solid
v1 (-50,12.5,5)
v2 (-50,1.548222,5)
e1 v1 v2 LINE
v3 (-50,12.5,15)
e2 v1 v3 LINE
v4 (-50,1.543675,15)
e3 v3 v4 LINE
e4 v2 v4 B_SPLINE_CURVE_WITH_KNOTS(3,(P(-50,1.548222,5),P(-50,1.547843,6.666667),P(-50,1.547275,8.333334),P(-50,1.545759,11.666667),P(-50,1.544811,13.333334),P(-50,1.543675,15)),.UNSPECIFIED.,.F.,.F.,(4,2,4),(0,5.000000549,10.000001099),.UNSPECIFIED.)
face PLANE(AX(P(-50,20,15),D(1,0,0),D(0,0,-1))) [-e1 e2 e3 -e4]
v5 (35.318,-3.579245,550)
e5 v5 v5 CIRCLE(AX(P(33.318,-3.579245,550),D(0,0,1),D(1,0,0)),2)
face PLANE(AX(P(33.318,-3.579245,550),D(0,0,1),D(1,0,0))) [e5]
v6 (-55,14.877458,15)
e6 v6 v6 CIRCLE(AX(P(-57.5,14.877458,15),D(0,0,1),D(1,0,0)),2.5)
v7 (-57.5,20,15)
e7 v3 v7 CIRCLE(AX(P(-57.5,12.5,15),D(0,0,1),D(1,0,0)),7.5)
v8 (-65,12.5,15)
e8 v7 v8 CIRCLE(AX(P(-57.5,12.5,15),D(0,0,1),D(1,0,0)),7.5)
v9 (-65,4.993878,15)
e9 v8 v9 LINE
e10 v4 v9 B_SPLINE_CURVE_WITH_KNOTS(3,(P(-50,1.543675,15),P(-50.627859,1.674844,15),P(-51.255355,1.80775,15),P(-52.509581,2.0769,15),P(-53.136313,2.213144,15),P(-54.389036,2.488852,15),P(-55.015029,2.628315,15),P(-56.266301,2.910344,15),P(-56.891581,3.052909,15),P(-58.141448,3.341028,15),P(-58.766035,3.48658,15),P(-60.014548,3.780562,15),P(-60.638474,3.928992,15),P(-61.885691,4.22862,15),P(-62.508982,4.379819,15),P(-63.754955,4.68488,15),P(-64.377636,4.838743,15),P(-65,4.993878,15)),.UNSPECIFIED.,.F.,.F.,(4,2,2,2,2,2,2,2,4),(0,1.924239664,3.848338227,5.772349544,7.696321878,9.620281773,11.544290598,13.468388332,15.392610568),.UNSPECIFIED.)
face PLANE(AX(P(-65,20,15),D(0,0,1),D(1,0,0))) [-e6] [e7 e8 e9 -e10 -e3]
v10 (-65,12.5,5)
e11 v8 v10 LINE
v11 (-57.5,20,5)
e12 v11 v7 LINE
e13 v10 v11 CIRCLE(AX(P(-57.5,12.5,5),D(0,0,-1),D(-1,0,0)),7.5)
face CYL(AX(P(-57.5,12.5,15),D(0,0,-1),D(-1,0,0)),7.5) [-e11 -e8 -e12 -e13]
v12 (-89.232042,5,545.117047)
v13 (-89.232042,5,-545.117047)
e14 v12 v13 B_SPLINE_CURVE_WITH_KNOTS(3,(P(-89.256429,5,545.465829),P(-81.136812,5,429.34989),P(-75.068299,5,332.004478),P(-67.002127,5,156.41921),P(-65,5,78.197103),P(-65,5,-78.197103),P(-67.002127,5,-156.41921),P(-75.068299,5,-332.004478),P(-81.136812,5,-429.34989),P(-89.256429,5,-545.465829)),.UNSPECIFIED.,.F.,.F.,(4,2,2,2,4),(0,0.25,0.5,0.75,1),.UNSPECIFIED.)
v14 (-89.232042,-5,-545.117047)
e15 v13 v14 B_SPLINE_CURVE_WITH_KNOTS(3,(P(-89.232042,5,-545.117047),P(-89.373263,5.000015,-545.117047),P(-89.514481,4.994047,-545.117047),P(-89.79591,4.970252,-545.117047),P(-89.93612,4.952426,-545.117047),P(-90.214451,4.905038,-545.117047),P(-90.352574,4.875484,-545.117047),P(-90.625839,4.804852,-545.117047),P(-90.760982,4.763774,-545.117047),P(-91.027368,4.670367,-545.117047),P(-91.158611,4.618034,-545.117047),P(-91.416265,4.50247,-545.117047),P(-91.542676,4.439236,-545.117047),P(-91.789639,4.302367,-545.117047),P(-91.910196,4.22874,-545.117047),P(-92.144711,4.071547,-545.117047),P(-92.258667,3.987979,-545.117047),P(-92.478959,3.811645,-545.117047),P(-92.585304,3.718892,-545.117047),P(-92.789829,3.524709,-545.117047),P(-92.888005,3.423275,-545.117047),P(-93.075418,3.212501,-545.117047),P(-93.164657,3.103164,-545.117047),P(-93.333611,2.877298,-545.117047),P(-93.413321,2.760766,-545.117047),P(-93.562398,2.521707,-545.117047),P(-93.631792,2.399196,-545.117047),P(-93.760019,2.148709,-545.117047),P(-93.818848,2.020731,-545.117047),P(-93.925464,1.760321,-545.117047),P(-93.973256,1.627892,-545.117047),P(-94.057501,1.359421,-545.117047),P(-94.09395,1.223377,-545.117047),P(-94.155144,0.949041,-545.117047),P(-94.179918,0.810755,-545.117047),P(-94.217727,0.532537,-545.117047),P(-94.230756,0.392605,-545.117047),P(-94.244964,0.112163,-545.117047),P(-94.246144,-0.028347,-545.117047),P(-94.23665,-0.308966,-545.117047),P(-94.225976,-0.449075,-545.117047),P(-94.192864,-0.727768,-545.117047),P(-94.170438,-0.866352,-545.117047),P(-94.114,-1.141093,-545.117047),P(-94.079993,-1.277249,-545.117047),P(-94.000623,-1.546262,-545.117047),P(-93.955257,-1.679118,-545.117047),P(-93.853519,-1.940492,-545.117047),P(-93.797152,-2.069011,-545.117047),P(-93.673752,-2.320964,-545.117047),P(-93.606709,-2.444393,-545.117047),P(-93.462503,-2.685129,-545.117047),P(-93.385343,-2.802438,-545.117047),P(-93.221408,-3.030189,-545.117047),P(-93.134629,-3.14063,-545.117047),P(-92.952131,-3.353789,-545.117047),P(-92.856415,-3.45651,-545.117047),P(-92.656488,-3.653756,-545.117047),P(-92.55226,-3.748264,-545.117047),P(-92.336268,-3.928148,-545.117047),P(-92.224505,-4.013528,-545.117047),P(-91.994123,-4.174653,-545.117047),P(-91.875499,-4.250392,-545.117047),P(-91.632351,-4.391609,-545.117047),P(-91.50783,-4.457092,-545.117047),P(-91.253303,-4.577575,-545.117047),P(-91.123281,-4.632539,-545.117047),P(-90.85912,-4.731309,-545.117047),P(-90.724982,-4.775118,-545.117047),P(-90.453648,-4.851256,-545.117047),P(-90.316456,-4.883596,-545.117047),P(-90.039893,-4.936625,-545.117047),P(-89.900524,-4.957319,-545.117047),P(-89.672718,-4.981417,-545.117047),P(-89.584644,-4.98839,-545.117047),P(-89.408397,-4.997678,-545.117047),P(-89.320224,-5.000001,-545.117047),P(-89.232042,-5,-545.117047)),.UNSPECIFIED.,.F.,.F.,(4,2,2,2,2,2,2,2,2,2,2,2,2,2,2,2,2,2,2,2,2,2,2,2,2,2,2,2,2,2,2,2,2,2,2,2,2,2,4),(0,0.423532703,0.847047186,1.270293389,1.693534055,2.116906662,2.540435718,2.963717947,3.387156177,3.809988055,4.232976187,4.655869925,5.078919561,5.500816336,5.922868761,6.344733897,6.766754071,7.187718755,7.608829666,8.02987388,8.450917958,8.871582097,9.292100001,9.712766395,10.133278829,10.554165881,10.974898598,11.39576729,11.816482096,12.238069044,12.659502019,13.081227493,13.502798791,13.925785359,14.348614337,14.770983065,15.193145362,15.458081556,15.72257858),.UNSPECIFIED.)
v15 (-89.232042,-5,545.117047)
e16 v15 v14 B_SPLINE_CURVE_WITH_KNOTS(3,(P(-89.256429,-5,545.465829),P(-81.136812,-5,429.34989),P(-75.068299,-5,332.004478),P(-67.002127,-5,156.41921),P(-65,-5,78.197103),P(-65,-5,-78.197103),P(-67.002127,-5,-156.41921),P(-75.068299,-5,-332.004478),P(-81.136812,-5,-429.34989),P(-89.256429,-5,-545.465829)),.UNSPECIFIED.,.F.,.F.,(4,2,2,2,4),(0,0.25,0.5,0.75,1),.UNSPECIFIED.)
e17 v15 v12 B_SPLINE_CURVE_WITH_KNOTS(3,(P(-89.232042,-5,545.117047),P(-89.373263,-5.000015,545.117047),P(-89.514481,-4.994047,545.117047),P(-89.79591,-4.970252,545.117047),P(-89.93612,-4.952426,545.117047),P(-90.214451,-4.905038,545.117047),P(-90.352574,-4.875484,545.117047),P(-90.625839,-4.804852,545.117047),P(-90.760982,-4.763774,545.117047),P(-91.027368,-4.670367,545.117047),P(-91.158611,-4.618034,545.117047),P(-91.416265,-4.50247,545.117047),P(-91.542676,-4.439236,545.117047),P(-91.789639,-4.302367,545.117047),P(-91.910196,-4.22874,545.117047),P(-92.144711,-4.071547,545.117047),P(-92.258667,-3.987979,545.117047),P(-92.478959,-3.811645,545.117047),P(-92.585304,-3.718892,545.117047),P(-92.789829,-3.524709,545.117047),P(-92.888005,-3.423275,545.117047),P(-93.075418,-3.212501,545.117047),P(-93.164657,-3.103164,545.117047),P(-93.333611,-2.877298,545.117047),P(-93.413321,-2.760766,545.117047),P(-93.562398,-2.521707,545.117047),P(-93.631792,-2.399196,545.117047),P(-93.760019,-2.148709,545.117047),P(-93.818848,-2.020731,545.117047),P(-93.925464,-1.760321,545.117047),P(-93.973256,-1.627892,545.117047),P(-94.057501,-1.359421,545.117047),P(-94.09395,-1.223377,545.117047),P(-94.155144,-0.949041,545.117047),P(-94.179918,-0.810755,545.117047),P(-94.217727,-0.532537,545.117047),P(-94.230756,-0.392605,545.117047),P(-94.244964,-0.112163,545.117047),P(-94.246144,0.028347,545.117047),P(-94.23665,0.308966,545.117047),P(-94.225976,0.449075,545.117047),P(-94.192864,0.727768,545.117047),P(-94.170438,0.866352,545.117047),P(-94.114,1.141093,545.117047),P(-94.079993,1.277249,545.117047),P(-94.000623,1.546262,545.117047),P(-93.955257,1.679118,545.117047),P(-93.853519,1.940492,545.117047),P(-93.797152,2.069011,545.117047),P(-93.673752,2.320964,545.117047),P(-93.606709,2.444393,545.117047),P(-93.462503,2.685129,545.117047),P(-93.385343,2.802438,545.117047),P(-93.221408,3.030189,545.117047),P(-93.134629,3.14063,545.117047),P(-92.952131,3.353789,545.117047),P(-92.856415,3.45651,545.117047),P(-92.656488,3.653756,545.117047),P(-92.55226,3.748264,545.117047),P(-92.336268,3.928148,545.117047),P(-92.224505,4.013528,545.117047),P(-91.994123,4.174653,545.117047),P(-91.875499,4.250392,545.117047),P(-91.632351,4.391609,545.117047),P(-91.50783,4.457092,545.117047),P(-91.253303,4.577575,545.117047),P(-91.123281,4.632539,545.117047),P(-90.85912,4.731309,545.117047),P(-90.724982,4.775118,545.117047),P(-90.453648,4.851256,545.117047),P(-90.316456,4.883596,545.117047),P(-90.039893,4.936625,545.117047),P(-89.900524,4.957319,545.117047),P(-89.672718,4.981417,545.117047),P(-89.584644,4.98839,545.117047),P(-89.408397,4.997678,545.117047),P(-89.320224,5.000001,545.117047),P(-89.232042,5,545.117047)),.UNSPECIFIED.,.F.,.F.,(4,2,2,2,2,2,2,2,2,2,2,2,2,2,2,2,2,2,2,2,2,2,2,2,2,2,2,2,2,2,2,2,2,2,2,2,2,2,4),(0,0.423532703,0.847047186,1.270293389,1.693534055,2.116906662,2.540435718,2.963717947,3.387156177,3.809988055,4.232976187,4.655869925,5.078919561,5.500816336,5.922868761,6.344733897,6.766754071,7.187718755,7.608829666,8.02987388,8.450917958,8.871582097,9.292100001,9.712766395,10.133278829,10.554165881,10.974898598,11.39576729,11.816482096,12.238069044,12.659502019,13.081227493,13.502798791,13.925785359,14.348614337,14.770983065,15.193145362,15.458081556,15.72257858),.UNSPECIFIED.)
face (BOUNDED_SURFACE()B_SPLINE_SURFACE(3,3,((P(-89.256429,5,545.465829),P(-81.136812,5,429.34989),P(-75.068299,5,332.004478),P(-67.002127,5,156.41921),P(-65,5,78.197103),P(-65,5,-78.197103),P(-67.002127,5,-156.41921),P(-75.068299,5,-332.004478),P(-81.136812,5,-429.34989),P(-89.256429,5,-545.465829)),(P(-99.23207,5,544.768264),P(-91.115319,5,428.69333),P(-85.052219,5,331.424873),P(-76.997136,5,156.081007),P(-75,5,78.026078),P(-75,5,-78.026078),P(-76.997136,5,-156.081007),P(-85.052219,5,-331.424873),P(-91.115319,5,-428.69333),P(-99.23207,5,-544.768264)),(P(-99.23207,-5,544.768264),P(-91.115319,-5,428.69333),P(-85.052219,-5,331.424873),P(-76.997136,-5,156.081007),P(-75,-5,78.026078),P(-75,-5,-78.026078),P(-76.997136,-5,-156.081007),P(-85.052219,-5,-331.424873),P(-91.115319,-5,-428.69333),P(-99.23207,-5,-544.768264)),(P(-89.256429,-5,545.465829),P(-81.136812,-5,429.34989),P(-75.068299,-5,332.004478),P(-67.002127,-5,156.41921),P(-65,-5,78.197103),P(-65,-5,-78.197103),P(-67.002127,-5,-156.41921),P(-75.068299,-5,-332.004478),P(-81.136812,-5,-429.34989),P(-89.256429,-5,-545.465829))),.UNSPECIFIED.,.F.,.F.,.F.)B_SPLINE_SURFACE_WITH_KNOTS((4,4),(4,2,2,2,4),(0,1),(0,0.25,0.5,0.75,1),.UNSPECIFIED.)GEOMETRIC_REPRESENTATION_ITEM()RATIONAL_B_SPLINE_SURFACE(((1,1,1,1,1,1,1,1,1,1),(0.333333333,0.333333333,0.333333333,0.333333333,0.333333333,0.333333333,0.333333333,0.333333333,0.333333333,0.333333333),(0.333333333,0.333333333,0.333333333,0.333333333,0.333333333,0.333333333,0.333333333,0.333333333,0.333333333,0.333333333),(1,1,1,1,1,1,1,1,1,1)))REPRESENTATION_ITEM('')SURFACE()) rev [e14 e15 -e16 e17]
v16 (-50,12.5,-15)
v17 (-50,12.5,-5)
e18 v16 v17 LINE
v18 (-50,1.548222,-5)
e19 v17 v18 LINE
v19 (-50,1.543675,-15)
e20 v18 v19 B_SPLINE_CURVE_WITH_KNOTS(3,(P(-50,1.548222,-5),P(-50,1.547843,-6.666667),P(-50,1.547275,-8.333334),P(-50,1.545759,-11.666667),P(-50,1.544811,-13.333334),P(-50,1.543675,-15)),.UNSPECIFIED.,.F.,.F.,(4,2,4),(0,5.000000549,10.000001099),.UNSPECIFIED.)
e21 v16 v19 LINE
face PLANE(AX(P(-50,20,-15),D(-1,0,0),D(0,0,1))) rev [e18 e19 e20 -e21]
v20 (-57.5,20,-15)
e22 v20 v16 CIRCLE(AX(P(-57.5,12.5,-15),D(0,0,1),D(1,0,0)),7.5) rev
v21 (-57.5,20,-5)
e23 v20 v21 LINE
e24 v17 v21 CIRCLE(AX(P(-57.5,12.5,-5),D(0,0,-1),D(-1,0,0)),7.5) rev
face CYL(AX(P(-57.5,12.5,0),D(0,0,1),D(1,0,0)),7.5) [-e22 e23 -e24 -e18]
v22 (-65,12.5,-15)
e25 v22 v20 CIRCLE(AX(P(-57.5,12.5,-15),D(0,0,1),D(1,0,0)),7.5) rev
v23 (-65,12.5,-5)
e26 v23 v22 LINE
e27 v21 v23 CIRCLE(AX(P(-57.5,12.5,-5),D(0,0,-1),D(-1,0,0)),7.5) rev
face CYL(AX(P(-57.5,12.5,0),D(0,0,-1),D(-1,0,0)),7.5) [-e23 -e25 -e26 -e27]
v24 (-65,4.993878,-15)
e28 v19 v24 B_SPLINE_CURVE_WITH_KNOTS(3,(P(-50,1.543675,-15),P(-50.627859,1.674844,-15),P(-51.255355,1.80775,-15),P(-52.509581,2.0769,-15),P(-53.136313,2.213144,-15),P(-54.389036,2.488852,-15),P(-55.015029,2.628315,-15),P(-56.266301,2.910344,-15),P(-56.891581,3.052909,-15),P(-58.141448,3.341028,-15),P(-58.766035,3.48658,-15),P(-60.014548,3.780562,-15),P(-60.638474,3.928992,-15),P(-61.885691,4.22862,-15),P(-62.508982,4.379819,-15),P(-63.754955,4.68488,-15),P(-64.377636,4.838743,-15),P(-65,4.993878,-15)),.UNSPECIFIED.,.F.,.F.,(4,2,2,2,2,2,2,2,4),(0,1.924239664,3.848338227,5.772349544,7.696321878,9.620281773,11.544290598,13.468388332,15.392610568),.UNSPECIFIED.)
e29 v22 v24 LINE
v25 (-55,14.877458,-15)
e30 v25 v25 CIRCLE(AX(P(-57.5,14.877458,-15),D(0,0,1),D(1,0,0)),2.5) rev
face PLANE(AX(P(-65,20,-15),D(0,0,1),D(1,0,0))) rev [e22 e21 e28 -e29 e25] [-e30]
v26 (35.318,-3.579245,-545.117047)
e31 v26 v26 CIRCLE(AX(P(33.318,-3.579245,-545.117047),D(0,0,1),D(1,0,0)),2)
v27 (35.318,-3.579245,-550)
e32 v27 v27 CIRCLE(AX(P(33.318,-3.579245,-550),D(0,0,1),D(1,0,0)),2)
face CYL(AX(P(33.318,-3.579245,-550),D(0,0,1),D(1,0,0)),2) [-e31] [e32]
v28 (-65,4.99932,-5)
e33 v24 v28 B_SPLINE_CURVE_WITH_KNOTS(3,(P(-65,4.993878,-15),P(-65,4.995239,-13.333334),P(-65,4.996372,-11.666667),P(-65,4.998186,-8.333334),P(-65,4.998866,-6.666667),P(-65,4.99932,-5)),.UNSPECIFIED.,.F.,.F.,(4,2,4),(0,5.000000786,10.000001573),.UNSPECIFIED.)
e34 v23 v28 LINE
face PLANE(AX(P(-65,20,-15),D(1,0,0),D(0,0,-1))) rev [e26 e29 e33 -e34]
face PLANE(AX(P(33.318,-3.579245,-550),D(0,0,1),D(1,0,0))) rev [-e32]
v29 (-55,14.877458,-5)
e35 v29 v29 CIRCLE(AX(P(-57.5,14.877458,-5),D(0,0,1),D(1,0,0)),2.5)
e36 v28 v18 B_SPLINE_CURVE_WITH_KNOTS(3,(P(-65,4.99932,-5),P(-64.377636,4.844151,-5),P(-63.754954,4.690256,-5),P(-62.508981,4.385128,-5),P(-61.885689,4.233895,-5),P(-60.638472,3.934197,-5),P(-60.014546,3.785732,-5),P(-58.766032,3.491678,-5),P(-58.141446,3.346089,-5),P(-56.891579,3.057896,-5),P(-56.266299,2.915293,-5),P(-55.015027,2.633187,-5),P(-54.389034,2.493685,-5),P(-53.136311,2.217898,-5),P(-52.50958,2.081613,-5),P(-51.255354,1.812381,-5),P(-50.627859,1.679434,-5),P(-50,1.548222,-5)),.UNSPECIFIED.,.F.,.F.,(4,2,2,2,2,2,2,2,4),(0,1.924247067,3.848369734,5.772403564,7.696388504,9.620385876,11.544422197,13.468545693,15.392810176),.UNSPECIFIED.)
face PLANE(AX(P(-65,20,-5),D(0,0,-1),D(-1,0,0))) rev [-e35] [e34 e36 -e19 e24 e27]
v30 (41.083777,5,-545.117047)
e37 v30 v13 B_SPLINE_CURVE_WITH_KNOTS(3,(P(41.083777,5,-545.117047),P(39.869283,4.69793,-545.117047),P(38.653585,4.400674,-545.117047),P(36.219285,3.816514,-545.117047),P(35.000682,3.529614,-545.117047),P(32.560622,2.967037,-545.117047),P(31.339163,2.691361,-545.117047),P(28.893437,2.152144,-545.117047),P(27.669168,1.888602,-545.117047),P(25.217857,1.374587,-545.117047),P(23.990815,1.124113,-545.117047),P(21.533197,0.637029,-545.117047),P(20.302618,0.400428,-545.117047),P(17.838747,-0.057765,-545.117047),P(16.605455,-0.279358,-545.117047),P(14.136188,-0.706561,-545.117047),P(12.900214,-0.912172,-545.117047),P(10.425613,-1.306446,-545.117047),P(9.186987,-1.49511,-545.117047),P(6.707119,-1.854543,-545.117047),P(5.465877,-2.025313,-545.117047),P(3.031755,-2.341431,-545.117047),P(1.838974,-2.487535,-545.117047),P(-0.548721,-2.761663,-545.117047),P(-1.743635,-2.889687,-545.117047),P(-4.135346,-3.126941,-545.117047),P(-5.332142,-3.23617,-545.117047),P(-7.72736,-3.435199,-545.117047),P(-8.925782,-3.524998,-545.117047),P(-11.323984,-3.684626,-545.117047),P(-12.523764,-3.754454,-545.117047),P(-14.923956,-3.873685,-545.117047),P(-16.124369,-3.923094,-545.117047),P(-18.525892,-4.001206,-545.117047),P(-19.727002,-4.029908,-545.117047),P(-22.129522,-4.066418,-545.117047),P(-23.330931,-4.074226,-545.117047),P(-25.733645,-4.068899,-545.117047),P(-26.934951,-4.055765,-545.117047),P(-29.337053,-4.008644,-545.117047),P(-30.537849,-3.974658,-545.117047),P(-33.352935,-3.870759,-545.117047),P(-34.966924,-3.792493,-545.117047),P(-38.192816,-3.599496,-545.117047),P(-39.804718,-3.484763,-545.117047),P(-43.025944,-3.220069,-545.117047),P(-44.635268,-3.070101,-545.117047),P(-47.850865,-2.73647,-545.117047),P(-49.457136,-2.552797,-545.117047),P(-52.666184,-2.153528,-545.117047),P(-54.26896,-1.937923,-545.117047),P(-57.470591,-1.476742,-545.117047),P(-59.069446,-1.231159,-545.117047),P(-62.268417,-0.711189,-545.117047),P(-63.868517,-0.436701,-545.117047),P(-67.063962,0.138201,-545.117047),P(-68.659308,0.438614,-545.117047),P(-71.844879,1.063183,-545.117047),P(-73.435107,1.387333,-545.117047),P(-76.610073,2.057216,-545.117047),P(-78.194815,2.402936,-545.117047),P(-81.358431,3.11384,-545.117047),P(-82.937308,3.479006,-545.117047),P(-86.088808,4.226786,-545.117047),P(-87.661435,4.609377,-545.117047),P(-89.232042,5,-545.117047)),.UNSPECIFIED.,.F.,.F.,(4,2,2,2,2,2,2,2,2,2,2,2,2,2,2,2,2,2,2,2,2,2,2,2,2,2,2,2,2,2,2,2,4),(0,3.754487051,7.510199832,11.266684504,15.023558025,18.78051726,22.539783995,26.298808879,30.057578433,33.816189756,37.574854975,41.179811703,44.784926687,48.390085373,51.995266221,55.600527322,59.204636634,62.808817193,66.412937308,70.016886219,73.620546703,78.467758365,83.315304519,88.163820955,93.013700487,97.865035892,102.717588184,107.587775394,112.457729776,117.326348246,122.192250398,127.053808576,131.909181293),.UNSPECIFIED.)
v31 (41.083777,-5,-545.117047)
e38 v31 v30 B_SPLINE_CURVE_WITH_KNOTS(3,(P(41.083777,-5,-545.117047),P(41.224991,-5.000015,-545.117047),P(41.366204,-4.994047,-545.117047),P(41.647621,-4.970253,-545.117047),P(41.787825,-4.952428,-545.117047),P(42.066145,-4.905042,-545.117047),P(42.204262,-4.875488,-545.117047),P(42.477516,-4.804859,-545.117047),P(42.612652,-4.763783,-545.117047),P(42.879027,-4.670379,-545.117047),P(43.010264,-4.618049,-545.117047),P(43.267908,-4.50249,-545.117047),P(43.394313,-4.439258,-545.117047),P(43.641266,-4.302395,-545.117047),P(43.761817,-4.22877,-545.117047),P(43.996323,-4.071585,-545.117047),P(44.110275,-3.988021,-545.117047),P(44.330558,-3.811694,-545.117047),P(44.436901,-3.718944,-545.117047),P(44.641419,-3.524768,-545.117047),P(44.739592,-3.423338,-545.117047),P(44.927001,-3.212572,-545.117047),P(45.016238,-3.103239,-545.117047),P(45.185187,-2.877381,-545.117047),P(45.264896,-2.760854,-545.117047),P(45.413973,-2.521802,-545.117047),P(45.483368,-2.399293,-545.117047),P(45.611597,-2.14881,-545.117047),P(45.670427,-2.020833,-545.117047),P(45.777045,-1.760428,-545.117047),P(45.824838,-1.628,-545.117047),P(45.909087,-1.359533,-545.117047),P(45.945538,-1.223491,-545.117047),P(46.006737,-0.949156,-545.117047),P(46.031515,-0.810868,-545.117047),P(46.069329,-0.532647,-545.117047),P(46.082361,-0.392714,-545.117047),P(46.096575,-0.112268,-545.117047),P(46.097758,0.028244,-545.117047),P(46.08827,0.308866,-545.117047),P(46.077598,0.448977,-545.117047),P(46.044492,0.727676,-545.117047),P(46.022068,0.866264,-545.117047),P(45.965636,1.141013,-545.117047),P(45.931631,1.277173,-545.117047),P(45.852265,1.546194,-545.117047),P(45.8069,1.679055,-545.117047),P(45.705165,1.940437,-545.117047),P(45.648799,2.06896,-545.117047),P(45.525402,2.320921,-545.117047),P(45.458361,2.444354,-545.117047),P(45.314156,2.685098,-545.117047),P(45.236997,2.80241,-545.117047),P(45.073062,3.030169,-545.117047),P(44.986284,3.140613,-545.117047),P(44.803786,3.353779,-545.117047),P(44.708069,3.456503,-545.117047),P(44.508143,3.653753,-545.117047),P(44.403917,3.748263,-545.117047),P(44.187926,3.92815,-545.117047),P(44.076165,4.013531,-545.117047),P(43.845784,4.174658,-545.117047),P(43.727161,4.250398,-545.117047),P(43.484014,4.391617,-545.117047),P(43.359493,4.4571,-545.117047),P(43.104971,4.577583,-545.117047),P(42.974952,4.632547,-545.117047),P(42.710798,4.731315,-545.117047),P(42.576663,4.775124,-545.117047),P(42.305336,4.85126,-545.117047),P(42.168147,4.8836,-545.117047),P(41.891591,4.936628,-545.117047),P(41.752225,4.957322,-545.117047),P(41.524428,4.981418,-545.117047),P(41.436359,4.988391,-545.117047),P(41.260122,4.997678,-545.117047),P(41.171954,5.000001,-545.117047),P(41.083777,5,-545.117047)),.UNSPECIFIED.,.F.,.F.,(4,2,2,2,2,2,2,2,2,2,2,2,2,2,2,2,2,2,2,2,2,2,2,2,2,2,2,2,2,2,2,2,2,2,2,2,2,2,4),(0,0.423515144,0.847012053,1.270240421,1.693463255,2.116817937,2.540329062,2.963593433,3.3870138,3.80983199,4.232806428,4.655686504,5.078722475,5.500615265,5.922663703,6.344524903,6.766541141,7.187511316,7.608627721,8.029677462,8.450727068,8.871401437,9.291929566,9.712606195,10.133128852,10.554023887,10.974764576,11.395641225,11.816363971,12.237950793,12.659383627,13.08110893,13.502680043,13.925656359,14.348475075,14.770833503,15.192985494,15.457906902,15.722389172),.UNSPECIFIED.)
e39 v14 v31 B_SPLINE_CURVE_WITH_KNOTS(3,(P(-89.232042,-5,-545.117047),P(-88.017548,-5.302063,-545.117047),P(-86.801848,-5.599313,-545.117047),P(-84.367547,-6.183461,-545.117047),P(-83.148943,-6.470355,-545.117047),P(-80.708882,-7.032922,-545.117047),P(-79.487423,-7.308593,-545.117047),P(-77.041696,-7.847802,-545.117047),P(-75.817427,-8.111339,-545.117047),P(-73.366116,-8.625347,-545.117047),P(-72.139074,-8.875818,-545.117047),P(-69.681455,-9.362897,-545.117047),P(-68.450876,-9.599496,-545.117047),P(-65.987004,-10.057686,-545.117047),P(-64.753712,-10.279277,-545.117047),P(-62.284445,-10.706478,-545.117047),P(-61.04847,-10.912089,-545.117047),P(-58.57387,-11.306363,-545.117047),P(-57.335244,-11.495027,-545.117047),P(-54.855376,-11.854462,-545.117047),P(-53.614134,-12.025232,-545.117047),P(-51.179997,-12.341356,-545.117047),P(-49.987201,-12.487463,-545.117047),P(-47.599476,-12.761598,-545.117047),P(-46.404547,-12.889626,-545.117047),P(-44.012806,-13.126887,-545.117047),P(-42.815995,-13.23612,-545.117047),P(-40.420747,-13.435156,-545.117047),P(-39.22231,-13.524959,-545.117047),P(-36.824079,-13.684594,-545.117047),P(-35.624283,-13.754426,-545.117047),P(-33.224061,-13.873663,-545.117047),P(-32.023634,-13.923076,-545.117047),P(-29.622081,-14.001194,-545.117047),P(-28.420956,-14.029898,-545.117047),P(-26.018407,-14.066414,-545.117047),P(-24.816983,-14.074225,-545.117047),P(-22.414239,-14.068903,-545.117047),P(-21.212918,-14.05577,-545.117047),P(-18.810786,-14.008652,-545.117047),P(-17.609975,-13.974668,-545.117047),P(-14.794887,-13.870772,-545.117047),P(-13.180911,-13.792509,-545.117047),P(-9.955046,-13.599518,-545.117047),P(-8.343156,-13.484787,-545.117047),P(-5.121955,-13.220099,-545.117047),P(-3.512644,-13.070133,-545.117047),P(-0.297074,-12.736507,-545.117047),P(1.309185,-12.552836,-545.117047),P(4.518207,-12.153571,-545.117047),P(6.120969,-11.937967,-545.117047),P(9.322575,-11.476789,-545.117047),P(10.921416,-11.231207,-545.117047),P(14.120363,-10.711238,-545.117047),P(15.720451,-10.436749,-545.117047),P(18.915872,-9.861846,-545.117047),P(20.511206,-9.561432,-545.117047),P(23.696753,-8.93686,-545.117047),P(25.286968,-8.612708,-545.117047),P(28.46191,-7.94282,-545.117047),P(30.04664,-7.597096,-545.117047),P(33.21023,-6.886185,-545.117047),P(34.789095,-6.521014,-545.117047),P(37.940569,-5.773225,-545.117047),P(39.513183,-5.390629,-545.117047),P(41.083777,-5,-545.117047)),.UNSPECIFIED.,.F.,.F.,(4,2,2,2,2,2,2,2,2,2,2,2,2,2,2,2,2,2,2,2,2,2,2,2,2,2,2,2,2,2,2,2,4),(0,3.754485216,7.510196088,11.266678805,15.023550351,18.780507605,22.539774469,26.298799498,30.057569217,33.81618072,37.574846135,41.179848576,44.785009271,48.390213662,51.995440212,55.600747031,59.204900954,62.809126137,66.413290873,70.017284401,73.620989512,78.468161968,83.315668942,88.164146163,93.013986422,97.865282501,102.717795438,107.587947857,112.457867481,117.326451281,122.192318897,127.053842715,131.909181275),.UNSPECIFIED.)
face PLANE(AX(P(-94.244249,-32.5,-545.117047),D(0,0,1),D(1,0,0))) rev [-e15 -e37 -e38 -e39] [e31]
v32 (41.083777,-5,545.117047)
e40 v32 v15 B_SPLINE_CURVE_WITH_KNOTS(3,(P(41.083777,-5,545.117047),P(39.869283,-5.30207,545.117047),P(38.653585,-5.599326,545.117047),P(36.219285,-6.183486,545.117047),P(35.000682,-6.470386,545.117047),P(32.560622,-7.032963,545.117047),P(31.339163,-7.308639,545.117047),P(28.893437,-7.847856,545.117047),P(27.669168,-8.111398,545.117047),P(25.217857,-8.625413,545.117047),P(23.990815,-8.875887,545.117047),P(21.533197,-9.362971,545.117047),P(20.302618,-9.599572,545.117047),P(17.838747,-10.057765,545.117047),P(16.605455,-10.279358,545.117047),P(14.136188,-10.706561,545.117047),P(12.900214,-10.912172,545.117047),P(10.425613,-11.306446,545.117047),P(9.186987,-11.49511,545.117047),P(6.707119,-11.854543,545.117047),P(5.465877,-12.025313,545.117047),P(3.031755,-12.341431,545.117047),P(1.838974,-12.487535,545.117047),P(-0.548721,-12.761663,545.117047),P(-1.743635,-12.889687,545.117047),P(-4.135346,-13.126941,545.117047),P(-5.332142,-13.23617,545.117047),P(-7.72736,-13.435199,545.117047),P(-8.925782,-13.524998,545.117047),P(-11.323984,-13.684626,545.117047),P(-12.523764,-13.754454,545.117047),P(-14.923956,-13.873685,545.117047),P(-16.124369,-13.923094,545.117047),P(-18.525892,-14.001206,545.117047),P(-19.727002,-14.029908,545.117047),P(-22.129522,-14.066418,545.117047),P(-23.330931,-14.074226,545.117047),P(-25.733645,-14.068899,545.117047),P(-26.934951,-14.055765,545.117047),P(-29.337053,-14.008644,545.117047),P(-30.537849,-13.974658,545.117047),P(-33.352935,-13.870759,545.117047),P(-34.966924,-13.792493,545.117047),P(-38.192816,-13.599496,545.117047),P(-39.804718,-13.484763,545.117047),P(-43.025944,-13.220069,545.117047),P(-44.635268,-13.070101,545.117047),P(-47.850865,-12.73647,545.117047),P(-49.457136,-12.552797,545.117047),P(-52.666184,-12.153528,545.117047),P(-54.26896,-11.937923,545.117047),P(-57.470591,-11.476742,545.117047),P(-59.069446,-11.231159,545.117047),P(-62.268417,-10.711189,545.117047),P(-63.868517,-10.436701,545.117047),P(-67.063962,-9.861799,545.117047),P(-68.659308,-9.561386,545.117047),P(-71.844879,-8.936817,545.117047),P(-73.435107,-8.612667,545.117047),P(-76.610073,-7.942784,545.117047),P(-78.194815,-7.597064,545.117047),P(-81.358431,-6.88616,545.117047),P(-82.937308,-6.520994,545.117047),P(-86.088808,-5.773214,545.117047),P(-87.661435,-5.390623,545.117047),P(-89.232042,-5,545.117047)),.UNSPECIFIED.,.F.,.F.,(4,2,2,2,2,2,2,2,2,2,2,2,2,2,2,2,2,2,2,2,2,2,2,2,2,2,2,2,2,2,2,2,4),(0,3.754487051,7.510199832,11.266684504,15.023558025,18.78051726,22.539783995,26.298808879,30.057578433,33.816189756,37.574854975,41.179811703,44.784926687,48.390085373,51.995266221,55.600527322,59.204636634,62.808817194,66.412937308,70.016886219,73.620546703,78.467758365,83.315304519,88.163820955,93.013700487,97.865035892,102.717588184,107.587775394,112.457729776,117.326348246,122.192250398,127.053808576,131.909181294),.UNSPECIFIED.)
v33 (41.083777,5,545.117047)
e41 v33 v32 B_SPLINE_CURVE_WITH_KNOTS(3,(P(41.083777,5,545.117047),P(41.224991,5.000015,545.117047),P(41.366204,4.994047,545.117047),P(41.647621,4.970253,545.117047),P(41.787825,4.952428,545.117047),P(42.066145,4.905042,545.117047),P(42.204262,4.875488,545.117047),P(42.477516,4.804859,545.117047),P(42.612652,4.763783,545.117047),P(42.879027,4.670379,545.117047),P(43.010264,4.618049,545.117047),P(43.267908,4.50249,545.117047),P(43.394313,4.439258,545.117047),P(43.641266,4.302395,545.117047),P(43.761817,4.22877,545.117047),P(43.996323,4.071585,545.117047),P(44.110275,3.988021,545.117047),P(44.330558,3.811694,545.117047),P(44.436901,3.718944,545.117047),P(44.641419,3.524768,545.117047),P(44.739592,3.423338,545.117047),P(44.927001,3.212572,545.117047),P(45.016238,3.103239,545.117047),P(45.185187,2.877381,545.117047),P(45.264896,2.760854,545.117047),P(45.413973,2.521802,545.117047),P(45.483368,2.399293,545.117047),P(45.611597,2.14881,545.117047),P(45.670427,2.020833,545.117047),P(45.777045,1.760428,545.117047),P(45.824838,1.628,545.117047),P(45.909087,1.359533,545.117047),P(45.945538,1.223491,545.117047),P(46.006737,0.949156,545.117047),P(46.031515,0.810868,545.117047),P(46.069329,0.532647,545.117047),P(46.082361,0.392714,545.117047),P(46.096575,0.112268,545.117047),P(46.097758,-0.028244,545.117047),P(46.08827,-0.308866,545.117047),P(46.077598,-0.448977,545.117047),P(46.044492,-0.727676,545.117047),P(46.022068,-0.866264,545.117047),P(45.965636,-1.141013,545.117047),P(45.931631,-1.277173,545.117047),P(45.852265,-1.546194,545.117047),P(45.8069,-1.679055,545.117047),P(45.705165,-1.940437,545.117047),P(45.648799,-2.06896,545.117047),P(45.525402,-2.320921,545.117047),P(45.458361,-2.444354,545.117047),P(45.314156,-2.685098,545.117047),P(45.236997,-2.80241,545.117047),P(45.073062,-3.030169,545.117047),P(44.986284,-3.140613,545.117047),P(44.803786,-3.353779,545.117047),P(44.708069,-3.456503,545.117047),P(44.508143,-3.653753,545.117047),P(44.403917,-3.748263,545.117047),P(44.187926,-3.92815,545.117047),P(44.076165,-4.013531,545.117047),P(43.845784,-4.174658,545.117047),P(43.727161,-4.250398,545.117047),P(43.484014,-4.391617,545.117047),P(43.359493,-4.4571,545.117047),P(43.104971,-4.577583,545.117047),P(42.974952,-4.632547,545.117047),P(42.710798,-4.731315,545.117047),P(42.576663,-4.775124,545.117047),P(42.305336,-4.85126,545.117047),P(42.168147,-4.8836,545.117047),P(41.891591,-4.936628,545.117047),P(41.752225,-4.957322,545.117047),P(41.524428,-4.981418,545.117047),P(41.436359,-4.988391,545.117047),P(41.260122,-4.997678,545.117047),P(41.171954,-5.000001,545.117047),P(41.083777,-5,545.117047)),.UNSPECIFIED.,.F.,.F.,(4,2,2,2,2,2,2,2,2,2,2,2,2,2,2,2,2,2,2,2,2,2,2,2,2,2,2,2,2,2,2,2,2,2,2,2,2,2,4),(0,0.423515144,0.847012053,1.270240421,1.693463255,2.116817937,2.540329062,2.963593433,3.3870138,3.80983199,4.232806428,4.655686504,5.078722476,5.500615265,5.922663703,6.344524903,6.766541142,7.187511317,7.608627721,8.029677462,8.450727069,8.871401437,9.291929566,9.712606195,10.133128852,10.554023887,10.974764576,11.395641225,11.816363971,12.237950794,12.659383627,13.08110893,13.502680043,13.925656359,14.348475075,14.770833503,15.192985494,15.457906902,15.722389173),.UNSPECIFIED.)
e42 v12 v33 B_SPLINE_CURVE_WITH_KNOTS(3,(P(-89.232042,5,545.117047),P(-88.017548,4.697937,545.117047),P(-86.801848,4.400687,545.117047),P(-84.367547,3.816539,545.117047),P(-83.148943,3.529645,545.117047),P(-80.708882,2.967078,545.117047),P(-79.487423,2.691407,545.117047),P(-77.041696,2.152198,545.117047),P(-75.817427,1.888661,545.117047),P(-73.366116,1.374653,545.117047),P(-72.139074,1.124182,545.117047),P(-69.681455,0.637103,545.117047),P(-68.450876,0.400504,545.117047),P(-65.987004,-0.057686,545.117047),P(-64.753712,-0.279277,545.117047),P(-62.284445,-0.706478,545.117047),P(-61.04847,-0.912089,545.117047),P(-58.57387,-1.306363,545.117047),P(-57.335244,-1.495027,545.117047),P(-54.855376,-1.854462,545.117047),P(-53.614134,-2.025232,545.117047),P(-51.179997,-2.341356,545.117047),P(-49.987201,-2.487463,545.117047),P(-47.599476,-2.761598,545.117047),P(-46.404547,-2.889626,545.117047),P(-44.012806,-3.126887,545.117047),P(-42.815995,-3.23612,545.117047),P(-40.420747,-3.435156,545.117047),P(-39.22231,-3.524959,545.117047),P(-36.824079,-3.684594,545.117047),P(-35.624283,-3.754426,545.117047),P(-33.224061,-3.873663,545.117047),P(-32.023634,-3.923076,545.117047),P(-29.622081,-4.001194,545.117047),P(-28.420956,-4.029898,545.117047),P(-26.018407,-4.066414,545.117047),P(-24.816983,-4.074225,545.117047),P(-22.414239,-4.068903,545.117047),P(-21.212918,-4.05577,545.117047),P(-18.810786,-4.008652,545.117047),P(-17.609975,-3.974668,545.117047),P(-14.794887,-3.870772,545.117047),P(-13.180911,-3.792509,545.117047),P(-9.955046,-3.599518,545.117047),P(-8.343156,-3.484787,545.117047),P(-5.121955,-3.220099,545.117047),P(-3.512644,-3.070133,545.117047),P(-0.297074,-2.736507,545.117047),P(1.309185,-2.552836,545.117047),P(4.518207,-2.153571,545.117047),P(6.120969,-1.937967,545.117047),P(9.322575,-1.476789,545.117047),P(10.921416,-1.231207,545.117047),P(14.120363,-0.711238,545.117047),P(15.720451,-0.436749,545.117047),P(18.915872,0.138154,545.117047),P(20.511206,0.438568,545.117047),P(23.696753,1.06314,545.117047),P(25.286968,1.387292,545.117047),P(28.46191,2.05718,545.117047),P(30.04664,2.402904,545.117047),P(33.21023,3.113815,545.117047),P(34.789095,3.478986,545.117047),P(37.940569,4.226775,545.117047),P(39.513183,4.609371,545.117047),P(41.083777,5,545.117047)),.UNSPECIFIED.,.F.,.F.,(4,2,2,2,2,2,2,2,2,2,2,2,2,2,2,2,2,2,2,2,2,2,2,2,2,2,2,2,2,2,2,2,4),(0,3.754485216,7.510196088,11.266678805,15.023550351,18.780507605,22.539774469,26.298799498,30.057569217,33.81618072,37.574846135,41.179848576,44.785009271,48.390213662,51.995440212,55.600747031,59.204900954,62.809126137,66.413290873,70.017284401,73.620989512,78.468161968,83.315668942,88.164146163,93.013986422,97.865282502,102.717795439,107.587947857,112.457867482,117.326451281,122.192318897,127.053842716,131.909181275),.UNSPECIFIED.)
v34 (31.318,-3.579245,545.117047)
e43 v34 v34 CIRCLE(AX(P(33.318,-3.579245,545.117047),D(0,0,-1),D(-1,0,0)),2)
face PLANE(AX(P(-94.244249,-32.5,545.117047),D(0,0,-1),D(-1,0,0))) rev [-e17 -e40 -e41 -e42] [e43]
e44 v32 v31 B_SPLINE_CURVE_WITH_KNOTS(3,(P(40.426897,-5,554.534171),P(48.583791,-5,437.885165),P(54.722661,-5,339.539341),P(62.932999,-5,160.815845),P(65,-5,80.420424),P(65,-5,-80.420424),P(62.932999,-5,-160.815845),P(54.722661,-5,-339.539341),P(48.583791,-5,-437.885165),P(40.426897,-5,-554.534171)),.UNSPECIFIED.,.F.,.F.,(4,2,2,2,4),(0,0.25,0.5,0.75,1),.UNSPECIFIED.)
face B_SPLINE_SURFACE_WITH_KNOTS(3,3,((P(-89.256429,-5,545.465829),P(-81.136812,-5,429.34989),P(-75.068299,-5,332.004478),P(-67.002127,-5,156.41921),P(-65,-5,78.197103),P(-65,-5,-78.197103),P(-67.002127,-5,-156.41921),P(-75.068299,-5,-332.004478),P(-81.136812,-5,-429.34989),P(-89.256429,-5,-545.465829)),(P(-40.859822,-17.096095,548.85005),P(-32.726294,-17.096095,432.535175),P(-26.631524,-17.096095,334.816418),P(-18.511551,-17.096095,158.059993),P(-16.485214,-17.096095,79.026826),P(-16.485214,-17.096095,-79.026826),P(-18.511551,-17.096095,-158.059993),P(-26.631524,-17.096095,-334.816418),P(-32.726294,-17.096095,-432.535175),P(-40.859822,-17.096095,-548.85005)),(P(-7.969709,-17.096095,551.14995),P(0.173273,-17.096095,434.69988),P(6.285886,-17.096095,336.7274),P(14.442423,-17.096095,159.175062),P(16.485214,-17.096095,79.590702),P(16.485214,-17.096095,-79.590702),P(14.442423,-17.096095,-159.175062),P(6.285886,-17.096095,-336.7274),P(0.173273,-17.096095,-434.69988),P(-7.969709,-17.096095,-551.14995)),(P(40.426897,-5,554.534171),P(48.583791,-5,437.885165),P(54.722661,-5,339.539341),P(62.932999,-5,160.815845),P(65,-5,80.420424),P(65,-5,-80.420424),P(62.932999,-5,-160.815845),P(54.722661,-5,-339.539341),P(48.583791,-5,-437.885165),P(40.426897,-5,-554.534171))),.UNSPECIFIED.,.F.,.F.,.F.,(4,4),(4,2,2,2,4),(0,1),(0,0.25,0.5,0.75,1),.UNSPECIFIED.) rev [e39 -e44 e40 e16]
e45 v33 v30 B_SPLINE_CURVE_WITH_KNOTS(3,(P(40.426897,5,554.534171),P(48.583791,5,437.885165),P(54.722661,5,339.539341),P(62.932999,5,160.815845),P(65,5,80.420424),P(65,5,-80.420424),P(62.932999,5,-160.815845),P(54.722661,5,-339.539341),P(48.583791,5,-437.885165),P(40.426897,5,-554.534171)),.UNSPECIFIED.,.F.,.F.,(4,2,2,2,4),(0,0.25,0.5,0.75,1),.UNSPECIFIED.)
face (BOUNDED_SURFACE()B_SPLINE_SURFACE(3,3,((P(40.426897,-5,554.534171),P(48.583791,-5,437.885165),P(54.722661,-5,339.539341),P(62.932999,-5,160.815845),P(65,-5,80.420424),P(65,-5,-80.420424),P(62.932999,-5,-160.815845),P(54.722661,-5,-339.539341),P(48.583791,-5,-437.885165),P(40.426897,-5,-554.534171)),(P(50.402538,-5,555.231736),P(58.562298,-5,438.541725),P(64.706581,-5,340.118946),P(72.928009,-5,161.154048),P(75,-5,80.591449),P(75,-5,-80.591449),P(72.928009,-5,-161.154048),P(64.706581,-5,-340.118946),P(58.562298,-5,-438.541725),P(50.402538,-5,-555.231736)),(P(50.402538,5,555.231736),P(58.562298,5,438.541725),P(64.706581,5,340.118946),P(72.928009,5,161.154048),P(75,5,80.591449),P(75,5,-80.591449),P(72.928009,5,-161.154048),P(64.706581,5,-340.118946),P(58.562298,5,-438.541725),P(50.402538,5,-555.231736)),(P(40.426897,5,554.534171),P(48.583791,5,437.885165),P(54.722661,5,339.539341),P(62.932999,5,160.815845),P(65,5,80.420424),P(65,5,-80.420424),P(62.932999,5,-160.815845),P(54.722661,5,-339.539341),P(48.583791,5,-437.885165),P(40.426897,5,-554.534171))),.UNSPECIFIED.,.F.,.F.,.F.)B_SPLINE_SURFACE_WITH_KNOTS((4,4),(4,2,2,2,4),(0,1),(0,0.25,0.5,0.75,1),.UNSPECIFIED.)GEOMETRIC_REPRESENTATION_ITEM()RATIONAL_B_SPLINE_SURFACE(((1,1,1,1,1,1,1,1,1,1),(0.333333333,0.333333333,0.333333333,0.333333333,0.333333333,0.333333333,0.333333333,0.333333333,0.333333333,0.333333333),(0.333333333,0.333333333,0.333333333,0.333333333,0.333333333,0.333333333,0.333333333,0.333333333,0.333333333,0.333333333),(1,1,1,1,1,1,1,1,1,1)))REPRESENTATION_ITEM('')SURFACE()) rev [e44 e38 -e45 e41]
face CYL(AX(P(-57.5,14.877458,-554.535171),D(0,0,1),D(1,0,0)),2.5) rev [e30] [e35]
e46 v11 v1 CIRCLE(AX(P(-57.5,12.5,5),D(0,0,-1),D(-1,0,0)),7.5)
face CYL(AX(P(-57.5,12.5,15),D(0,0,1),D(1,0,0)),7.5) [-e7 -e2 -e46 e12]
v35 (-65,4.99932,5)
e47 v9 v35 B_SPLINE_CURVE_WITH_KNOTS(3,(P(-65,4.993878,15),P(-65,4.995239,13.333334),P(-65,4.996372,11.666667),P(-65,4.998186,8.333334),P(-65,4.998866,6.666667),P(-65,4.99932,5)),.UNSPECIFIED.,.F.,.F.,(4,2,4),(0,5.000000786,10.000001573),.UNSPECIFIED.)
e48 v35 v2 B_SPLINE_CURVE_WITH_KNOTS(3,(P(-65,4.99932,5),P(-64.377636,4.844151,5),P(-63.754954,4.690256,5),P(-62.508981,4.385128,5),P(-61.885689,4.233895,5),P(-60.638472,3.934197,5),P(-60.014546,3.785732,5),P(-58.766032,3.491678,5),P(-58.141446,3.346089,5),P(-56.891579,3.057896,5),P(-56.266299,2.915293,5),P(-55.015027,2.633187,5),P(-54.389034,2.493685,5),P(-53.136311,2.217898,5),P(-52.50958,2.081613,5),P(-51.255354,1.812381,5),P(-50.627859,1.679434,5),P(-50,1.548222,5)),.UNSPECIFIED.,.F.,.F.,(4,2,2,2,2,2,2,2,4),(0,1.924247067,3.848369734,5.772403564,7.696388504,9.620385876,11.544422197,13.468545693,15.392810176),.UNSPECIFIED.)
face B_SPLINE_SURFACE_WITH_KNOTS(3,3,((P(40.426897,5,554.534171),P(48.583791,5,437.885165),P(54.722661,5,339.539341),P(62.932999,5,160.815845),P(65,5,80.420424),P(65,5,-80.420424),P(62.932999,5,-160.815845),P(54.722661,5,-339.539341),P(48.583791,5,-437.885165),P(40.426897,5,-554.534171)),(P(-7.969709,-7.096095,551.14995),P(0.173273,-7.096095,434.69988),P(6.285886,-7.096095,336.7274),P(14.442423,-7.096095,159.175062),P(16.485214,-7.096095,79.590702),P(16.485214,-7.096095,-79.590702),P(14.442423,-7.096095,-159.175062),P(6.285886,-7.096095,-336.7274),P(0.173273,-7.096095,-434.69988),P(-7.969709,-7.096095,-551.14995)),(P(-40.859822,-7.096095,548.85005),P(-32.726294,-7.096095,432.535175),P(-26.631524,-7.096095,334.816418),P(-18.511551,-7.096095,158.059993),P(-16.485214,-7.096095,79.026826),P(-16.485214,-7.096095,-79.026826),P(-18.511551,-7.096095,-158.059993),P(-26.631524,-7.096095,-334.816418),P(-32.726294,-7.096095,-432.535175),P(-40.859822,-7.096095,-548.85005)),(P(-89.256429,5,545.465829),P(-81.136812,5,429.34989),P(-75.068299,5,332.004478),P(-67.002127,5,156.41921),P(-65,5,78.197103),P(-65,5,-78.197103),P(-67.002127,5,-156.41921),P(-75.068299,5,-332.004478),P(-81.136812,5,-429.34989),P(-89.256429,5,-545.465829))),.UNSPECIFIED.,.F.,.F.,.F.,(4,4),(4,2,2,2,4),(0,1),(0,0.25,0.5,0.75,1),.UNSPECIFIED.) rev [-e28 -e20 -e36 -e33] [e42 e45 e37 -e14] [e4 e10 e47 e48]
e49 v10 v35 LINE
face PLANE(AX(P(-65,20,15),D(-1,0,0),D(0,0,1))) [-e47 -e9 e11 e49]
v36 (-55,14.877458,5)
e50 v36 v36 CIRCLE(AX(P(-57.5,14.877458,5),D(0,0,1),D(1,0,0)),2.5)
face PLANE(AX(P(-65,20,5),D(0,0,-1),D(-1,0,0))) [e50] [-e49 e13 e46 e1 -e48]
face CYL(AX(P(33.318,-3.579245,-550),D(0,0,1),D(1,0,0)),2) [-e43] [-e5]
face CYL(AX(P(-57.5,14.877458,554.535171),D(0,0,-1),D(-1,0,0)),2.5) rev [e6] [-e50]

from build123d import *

# Parameters (mm, degrees)
SKETCH4_W            = 143.511953983
SKETCH4_H            = 18.108430665
SKETCH4_W_2          = 146.403726808
SKETCH4_H_2          = 23.968157225
CUT_EXTRUDE1_DEPTH   = 32.5
SKETCH3_R            = 2
BOSS_EXTRUDE1_DEPTH  = 550
SKETCH5_W            = 15
SKETCH5_H            = 10
BOSS_EXTRUDE2_DEPTH  = 20
CUT_EXTRUDE2_REACH   = 565.3
SKETCH6_R            = 2.5
FILLET1_R            = 7.5
FILLET1_OF_MIRROR1_R = 7.5


with BuildPart() as part:
    # Sweep2: sweep along a path in Sketch2
    with BuildLine() as sweep2_path:  # in the path sketch's own coordinates; laid on its plane below (add() does not lay a ready-made edge on the line's plane)
        add(Edge.make_bspline(
            [(-24.41476581, 550), (8.13825527, 84.470109879), (8.13825527, -84.470109879), (-24.41476581, -550)],
            knots=[0, 0, 0, 0, 1, 1, 1, 1], degree=3))
    # Sketch1 → Sweep2 (sweep)
    with BuildSketch(Plane.XY):
        with BuildLine():
            ThreePointArc((65, -5), (70, 0), (65, 5))
            add(Edge.make_bspline(
                [(-65, 5), (-16.485213686, -7.09609478), (16.485213686, -7.09609478), (65, 5)],
                knots=[0, 0, 0, 0, 1, 1, 1, 1], degree=3))
            ThreePointArc((-65, 5), (-70, 0), (-65, -5))
            add(Edge.make_bspline(
                [(-65, -5), (-16.485213686, -17.09609478), (16.485213686, -17.09609478), (65, -5)],
                knots=[0, 0, 0, 0, 1, 1, 1, 1], degree=3))
        make_face()
    sweep(path=Plane(origin=(0, 0, 0), x_dir=(1, 0, 0), z_dir=(0, 1, 0)) * sweep2_path.line)

    # Sketch4 → Cut-Extrude1 (cut, symmetric)
    with BuildSketch(Plane(origin=(0, 0, 0), x_dir=(1, 0, 0), z_dir=(0, 1, 0))):
        with Locations((-22.488272338, -554.171262171)):
            Rectangle(SKETCH4_W, SKETCH4_H)
        with Locations((-21.042385925, 557.101125451)):
            Rectangle(SKETCH4_W_2, SKETCH4_H_2)
    extrude(amount=CUT_EXTRUDE1_DEPTH, both=True, mode=Mode.SUBTRACT)

    # Sketch3 → Boss-Extrude1 (add, symmetric)
    with BuildSketch(Plane.XY):
        with Locations((33.317999856, -3.579245113)):
            Circle(SKETCH3_R)
    extrude(amount=BOSS_EXTRUDE1_DEPTH, both=True)

    # Sketch5 → Boss-Extrude2 (add)
    with BuildSketch(Plane(origin=(0, 0, 0), x_dir=(1, 0, 0), z_dir=(0, 1, 0))):
        with Locations((-57.5, 10)):
            Rectangle(SKETCH5_W, SKETCH5_H)
    boss_extrude2 = extrude(amount=BOSS_EXTRUDE2_DEPTH)

    # Sketch6 → Cut-Extrude2 (cut, up to next)
    with BuildSketch(Plane.XY.offset(-5), mode=Mode.PRIVATE) as cut_extrude2_sk1:
        with Locations((-57.5, 14.877458303)):
            Circle(SKETCH6_R)
    cut_extrude2_tool1 = extrude(cut_extrude2_sk1.sketch, amount=-CUT_EXTRUDE2_REACH, mode=Mode.PRIVATE) & part.part
    cut_extrude2 = cut_extrude2_tool1.solids().sort_by_distance((-57.5, 14.877458, -5))[0]
    add(cut_extrude2, mode=Mode.SUBTRACT)

    # Fillet1
    fillet1_edges = [part.edges().sort_by_distance(p)[0] for p in [
        (-50, 20, -10),
        (-65, 20, -10),
    ]]
    fillet(fillet1_edges, radius=FILLET1_R - 0.0001)  # a hair under: the kernel refuses the full size

    # Mirror1: Boss-Extrude2, Cut-Extrude2 across plane
    add(boss_extrude2.mirror(Plane.XY))
    add(cut_extrude2.mirror(Plane.XY), mode=Mode.SUBTRACT)

    # Fillet1 of Mirror1
    fillet1_of_mirror1_edges = [part.edges().sort_by_distance(p)[0] for p in [
        (-50, 20, 10),
        (-65, 20, 10),
    ]]
    fillet(fillet1_of_mirror1_edges, radius=FILLET1_OF_MIRROR1_R - 0.0001)  # a hair under: the kernel refuses the full size


solid = part.part
